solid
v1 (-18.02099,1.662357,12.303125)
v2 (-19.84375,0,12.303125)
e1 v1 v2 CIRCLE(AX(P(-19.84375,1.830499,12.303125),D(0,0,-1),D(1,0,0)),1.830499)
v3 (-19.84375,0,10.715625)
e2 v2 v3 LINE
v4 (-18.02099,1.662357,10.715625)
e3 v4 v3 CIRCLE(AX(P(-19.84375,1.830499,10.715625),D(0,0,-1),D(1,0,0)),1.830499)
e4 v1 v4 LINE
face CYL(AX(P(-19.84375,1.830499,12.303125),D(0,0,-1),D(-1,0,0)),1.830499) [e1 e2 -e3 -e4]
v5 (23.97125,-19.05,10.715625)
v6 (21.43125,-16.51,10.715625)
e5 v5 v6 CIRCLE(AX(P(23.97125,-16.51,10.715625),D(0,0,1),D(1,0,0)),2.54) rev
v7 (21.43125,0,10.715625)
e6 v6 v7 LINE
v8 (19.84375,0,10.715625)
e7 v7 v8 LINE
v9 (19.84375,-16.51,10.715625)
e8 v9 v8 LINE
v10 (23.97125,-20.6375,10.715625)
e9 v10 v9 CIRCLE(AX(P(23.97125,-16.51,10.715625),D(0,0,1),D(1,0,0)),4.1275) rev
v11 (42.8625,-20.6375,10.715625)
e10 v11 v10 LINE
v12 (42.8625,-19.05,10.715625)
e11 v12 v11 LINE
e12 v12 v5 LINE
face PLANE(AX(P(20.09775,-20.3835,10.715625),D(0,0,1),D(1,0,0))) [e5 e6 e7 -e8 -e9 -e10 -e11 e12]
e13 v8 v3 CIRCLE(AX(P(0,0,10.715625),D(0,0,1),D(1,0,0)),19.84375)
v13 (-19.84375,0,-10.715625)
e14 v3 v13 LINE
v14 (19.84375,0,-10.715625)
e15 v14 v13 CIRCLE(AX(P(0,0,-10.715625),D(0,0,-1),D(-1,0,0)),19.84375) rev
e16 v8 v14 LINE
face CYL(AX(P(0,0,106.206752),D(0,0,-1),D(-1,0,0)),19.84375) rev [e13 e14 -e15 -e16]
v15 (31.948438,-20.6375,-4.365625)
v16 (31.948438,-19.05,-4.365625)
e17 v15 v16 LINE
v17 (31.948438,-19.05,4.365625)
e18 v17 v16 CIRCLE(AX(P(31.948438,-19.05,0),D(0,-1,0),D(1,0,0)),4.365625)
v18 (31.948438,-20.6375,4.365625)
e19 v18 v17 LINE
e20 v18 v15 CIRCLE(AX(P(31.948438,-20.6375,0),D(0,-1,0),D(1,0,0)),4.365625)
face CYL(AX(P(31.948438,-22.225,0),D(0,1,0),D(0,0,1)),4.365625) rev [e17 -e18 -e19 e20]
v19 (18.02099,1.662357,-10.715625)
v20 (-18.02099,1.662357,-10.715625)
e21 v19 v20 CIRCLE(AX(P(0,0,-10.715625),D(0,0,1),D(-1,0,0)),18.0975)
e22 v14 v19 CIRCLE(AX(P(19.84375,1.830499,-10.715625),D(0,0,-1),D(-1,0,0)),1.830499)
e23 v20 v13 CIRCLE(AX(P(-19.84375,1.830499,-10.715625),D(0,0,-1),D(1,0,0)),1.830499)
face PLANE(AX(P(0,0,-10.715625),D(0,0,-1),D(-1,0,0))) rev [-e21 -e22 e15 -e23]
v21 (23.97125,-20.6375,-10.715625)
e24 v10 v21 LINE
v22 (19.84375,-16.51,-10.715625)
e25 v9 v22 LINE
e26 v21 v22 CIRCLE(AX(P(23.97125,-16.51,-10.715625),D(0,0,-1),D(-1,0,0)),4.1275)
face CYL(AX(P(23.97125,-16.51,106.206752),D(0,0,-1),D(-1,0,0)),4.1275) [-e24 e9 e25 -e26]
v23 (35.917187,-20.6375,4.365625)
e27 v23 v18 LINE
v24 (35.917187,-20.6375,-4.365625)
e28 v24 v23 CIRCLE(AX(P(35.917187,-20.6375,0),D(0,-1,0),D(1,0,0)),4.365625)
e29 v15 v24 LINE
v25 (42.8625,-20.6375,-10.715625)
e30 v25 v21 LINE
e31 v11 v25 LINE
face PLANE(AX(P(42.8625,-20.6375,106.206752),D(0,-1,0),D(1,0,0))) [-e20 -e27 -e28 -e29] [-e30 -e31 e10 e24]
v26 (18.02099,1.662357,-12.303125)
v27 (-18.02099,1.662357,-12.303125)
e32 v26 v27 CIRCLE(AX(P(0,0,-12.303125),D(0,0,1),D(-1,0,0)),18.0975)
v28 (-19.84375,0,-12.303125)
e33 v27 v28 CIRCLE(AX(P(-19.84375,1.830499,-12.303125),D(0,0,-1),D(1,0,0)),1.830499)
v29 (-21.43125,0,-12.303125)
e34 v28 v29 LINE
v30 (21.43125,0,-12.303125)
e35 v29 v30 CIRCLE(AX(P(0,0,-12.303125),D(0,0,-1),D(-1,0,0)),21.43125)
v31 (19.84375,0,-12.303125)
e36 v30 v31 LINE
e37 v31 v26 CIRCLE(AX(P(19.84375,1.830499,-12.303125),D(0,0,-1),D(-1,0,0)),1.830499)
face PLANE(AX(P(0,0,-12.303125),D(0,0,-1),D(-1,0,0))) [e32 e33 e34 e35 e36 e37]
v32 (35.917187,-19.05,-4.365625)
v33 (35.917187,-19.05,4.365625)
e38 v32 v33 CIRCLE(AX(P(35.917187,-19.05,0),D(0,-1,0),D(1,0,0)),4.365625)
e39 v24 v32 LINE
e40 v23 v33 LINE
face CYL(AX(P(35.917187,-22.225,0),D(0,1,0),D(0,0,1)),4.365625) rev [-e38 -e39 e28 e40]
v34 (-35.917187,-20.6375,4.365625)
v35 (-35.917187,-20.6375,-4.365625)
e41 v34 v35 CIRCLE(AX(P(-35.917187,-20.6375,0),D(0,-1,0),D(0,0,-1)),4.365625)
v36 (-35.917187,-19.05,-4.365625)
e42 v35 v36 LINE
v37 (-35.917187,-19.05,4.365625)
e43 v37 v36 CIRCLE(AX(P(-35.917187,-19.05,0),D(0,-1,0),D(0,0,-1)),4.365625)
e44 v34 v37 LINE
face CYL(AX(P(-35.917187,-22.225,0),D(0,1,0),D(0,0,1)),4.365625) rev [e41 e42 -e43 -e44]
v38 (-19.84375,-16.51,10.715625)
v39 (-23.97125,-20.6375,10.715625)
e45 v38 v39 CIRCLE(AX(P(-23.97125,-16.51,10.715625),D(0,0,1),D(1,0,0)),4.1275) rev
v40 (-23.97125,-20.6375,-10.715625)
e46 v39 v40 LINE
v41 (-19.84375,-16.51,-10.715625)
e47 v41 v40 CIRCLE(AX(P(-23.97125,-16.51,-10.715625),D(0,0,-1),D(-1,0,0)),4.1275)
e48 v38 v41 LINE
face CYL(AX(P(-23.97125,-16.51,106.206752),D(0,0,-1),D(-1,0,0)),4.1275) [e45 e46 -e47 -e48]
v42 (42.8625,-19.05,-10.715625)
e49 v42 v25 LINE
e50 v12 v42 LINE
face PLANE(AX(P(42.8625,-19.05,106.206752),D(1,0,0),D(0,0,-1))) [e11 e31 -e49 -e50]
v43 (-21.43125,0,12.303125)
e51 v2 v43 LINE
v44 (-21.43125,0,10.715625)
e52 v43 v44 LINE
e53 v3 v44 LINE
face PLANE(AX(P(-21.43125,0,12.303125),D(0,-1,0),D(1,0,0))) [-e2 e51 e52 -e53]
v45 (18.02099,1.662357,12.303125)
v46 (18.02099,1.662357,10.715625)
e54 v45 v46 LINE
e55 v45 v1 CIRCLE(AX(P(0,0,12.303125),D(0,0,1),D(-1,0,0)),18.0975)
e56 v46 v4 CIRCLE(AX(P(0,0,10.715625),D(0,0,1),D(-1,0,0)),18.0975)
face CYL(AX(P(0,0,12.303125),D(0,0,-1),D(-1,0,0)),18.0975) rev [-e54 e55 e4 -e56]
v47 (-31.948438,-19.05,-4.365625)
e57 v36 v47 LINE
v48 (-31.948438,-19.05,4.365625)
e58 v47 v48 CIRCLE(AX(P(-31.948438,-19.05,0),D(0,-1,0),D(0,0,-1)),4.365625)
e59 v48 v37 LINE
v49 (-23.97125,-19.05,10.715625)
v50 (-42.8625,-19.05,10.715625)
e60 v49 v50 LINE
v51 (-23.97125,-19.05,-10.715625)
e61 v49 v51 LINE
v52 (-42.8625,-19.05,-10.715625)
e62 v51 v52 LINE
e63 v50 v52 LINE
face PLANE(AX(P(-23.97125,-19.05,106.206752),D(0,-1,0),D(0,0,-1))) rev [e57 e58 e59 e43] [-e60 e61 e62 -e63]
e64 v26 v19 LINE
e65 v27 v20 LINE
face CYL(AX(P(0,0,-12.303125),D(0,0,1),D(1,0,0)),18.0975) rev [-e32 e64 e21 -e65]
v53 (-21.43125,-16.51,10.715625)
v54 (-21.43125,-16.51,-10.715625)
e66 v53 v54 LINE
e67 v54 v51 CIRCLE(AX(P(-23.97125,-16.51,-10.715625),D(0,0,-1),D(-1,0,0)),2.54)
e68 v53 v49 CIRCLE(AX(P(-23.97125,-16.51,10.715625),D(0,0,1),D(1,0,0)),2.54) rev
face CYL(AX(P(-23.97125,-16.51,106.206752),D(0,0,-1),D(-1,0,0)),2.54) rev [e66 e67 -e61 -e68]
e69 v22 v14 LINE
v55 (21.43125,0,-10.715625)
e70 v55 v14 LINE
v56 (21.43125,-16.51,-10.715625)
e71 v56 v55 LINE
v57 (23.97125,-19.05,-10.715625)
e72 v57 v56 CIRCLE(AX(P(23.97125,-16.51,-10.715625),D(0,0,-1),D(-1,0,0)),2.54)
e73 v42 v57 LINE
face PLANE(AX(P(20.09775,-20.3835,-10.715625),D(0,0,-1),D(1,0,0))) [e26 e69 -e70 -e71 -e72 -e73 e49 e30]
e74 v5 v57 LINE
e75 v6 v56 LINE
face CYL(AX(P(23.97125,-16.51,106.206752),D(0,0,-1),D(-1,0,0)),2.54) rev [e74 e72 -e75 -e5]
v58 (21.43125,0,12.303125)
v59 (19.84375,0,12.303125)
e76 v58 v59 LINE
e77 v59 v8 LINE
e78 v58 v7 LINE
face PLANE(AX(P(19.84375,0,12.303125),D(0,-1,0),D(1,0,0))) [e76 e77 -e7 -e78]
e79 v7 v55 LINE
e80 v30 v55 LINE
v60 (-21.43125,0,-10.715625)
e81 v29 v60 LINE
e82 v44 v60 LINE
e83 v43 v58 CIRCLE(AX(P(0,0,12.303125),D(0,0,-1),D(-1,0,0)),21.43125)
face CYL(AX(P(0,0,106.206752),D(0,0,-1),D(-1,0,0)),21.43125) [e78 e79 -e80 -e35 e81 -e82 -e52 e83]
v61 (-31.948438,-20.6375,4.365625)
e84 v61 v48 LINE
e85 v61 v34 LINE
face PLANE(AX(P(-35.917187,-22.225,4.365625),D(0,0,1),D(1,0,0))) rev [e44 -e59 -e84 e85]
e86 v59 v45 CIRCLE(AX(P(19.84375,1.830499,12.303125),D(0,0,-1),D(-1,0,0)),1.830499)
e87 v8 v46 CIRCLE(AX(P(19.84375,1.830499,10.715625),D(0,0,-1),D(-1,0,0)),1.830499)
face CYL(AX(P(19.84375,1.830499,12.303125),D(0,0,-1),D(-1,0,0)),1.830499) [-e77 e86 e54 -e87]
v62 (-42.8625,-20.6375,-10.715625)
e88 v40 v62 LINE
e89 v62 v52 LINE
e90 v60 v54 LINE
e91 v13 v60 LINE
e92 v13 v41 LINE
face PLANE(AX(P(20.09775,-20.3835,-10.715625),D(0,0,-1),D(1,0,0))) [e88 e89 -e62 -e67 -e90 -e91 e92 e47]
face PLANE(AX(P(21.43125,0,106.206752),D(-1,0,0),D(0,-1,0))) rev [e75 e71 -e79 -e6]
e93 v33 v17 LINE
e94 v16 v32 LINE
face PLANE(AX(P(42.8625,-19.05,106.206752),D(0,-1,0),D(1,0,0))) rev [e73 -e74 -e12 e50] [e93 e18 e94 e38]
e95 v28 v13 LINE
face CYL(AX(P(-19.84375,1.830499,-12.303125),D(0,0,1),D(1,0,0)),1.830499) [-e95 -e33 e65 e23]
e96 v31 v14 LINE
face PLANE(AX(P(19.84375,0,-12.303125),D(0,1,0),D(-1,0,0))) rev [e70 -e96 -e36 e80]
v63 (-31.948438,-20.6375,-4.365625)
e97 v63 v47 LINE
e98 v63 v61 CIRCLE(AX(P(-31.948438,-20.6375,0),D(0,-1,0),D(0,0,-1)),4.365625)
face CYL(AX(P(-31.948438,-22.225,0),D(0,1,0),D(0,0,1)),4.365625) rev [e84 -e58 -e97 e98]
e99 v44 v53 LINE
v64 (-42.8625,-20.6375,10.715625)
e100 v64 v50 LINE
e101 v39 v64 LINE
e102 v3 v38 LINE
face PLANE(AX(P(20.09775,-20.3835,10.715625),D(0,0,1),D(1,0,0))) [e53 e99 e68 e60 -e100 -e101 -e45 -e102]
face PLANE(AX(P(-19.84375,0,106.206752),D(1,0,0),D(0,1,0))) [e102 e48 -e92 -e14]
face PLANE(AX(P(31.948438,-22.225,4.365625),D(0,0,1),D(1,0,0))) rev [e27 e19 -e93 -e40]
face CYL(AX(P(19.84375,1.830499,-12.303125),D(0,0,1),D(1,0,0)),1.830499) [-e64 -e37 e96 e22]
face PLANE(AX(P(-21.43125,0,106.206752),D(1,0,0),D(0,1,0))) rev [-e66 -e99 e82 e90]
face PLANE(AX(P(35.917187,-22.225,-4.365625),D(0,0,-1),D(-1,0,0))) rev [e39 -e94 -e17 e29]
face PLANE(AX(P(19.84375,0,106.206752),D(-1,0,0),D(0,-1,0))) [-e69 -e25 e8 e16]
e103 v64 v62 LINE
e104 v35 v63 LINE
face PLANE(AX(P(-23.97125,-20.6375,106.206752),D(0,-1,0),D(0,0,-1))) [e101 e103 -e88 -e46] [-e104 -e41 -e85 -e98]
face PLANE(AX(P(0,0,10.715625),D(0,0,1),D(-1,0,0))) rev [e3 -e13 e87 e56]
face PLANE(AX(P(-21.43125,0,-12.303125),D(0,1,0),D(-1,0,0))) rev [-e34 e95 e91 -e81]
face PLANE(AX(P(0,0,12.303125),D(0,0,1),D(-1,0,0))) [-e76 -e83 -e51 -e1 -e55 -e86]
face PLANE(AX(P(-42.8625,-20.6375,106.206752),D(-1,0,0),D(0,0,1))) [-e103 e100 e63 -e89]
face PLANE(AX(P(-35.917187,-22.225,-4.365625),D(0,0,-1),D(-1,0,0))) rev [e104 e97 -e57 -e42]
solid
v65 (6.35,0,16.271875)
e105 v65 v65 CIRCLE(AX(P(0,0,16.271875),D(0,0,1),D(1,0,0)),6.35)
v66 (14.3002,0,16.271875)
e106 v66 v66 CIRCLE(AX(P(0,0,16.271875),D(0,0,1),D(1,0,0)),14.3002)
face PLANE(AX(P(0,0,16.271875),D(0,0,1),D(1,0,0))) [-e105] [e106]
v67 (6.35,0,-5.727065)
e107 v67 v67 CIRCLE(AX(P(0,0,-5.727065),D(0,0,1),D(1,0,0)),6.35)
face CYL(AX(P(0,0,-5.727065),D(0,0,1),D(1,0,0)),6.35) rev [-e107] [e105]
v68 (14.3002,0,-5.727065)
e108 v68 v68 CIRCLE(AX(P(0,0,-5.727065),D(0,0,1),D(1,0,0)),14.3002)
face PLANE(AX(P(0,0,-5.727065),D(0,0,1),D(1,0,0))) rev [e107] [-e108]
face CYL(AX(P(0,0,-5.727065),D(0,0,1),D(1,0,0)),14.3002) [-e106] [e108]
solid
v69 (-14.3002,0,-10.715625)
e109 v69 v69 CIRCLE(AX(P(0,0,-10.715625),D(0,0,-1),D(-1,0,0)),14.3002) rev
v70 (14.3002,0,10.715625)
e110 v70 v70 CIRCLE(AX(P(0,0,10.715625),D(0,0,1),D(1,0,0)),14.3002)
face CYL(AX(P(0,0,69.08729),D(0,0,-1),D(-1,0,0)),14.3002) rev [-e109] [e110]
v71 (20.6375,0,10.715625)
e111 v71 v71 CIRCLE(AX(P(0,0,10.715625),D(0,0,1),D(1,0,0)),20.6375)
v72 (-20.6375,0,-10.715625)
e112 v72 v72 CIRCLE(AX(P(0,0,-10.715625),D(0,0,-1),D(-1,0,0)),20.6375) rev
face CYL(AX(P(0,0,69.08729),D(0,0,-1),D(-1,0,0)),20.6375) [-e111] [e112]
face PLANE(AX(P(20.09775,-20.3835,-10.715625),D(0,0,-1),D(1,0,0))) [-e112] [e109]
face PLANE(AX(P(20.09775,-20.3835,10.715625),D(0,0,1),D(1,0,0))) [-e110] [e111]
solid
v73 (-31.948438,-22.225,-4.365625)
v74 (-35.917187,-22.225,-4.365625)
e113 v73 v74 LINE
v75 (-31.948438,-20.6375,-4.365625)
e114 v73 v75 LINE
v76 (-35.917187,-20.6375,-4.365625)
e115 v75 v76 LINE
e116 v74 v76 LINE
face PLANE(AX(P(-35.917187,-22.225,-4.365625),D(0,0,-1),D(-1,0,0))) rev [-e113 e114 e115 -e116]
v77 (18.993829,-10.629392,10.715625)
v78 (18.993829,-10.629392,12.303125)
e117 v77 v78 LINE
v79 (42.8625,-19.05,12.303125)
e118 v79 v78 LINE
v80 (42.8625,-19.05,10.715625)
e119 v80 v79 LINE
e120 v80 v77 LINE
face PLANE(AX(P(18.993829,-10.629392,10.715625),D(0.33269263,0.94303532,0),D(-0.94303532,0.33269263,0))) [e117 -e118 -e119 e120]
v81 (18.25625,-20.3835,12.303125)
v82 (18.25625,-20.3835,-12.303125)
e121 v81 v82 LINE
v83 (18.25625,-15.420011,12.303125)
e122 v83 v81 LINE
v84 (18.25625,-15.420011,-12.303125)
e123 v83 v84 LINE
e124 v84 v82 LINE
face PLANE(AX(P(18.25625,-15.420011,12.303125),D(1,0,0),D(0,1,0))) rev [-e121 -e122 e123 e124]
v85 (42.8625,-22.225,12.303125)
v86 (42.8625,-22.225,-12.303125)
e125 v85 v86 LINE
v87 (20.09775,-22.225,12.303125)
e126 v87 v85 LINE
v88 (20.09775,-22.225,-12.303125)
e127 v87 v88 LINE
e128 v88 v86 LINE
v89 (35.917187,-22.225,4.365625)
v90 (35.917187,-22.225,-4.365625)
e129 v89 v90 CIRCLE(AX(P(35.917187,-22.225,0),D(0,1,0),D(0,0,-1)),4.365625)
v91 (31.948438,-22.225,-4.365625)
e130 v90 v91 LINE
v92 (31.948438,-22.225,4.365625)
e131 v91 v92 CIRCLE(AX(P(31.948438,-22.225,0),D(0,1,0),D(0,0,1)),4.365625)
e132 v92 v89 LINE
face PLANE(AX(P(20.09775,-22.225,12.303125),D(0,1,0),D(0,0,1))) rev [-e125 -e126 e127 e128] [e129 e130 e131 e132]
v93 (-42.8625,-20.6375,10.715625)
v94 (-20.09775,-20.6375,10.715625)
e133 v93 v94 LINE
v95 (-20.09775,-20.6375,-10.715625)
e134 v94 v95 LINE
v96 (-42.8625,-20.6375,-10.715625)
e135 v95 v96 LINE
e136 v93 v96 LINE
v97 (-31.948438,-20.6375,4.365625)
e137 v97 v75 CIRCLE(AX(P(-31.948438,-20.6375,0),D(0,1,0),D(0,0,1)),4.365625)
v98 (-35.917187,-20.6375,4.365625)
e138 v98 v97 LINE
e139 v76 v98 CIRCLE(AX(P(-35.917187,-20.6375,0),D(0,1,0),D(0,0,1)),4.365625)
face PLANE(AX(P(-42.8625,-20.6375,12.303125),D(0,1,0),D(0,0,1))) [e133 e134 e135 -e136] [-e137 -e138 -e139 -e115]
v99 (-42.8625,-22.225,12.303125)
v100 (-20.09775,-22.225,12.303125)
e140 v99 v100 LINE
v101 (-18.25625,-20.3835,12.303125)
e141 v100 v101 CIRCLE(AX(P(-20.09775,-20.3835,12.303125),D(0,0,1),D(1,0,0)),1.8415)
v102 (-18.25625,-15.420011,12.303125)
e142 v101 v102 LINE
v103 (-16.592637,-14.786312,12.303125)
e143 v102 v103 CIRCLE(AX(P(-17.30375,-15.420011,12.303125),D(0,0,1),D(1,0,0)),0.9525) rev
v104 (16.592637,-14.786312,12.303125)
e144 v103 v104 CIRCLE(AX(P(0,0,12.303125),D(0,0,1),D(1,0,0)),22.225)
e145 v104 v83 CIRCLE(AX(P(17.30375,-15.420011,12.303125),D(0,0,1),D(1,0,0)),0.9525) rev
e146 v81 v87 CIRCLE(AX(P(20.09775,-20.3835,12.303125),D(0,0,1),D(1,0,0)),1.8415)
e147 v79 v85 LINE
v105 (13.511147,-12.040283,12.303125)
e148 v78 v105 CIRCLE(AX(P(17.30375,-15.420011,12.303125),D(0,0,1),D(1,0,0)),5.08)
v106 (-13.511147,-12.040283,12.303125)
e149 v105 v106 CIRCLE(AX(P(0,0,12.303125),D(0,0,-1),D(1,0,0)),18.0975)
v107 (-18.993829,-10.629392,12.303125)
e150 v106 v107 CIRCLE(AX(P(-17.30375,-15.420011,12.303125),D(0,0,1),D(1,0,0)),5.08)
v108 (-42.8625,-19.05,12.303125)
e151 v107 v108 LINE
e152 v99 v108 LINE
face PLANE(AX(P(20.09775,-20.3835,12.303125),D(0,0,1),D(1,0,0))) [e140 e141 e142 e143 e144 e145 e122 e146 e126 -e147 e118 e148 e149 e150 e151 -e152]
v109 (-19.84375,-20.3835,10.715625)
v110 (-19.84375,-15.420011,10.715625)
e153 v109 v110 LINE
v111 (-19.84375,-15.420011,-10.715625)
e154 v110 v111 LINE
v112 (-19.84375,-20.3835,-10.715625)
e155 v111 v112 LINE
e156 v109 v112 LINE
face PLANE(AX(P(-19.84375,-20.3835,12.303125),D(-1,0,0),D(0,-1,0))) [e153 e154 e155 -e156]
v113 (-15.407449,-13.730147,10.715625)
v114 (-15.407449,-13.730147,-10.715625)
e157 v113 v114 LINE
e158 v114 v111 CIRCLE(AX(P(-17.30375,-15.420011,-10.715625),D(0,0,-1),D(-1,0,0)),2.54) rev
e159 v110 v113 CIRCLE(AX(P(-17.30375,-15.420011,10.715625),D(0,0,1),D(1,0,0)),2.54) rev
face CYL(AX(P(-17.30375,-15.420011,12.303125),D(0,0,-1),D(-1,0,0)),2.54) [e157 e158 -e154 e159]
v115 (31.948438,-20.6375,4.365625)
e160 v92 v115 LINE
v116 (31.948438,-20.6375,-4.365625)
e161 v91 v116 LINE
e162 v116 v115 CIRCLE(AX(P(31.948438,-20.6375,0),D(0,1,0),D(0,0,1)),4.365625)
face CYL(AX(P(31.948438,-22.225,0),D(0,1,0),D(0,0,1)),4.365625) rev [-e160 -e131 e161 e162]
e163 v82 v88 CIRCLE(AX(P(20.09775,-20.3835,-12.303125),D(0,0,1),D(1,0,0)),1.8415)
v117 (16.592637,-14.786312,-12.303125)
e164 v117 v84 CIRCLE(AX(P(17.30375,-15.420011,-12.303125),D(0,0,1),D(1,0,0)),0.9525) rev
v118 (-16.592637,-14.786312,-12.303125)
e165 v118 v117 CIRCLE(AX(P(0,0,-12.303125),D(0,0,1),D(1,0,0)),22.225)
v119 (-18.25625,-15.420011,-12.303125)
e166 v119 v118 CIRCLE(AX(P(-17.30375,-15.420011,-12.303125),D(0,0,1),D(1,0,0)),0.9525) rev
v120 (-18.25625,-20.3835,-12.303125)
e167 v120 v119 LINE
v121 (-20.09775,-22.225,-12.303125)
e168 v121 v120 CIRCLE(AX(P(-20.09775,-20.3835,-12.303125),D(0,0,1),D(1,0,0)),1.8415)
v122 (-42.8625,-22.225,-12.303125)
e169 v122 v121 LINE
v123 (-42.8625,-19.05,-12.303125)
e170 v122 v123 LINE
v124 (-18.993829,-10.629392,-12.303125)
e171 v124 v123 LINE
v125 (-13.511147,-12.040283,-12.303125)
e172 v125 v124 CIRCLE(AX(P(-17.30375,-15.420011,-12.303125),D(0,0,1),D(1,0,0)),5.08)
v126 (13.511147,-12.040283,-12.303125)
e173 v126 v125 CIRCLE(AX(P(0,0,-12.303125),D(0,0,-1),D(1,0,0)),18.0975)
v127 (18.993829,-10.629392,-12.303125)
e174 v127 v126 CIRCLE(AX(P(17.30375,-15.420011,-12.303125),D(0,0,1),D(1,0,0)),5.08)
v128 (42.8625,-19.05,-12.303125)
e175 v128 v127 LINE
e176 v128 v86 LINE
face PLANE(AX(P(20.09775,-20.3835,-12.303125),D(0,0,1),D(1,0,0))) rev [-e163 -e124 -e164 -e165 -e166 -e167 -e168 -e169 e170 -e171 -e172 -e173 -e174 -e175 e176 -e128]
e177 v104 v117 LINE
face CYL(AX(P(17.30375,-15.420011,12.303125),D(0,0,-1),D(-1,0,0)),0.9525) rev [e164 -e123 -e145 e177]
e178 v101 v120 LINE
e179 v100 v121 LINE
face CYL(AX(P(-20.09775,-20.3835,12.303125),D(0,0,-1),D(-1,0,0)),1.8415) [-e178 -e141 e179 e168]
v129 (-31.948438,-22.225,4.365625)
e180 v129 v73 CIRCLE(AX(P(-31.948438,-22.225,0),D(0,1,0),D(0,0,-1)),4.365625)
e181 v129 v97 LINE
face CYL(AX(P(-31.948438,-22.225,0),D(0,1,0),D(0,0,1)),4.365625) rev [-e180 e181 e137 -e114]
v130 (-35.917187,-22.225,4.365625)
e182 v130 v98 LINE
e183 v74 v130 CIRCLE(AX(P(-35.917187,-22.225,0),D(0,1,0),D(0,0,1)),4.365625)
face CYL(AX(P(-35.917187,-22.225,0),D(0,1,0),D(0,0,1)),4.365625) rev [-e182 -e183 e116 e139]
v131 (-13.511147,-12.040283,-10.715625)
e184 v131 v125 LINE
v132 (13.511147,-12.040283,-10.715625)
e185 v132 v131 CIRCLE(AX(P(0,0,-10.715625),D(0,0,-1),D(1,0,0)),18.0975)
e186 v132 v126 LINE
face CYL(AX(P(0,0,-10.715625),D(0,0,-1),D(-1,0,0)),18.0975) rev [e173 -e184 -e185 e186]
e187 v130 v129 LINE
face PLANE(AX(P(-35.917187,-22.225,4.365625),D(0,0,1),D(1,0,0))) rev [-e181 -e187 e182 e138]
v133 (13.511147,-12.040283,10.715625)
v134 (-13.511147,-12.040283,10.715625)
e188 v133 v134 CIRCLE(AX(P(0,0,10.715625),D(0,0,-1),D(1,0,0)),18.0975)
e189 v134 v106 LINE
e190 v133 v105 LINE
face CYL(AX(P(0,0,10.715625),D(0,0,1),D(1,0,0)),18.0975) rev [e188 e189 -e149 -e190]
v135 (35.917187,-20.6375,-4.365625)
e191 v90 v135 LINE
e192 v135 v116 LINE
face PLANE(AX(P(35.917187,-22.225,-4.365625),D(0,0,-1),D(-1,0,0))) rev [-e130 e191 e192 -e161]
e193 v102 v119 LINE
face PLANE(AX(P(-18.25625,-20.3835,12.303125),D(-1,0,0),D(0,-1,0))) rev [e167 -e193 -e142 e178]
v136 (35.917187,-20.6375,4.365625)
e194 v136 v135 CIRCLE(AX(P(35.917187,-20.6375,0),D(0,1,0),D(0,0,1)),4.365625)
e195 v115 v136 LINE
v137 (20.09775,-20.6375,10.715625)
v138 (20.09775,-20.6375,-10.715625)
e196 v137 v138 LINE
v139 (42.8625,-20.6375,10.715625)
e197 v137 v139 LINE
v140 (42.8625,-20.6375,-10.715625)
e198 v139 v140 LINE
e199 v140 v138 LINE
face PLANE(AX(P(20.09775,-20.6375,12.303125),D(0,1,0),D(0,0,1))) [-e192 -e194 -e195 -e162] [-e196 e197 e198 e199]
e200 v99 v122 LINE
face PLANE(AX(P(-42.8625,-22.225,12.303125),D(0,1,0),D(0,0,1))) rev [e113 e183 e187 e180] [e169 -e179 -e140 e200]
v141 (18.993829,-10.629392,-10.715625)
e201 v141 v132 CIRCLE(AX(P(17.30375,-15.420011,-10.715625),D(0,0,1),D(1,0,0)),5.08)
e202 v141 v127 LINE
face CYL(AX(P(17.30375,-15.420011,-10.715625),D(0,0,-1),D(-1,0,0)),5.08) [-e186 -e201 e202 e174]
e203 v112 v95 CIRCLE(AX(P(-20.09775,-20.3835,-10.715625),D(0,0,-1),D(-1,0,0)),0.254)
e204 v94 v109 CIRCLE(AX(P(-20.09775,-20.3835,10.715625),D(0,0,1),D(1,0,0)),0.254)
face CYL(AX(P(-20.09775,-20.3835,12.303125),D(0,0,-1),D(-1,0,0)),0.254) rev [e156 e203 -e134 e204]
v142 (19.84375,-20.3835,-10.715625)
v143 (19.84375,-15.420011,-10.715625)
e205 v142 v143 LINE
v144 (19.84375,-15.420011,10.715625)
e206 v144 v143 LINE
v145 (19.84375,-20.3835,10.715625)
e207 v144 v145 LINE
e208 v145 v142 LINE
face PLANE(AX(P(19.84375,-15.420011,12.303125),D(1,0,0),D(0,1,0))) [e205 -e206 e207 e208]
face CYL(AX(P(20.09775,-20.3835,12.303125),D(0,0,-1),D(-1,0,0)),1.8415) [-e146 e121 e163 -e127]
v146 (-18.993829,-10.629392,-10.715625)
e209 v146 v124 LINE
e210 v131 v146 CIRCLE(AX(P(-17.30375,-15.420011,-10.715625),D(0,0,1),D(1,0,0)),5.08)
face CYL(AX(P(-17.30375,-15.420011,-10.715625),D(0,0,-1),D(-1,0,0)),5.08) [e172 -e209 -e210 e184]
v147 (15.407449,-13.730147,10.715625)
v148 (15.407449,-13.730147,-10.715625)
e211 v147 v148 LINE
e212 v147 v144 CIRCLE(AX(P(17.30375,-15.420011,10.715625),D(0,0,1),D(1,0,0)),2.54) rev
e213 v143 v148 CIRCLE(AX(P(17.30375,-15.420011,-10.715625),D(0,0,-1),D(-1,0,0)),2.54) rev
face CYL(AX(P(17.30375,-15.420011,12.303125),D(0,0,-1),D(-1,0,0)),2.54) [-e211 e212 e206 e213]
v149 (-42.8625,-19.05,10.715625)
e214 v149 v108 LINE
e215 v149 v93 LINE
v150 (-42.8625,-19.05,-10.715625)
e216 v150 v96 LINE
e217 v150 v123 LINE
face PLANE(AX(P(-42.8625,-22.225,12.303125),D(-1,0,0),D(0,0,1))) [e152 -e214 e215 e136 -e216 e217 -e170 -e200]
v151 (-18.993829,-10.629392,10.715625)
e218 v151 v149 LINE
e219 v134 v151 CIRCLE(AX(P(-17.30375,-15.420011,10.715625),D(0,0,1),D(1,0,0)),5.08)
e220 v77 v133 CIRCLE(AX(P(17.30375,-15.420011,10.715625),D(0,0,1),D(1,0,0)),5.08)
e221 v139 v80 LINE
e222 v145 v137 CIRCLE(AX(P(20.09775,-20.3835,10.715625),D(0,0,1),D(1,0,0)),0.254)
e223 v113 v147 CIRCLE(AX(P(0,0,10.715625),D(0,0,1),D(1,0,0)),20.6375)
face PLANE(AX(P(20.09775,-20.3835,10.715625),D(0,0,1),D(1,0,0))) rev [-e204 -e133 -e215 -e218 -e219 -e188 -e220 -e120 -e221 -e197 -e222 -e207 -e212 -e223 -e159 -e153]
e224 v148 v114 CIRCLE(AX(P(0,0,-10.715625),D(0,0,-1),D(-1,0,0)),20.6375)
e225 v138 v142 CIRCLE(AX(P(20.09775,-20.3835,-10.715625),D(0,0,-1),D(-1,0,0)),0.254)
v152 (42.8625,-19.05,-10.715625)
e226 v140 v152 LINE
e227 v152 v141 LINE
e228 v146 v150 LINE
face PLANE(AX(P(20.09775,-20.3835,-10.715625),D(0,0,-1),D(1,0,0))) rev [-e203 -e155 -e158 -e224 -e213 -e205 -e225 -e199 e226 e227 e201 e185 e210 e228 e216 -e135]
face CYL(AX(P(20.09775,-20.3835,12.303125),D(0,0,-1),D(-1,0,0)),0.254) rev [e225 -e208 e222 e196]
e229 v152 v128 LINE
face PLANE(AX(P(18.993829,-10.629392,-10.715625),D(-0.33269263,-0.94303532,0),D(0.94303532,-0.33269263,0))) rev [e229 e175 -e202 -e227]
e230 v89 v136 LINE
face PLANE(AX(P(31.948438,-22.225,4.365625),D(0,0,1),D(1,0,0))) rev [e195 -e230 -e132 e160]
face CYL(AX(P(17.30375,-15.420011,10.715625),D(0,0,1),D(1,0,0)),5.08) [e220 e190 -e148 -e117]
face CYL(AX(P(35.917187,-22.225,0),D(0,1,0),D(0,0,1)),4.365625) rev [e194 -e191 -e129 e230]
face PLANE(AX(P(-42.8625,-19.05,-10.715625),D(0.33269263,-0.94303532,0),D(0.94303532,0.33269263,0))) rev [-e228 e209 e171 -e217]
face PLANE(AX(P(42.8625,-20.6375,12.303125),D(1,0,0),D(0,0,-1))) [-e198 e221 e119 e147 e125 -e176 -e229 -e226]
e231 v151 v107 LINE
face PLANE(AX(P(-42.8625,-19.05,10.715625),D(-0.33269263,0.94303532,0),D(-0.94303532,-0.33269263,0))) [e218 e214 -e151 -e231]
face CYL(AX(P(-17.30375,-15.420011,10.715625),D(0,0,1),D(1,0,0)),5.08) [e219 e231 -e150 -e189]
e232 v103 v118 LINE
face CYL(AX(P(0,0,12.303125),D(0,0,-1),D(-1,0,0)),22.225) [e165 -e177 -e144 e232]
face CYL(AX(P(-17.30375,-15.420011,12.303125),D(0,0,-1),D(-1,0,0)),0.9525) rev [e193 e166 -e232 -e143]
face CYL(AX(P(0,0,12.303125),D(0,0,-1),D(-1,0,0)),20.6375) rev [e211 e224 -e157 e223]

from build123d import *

# Parameters (mm, degrees)
EXTRUDE_THIN2_DEPTH  = 12.303125
EXTRUDE1_DEPTH       = 1.5875
EXTRUDE_THIN3_START  = -10.715625
EXTRUDE_THIN3_DEPTH  = 21.43125
EXTRUDE2_DEPTH       = 1.5875
EXTRUDE3_START       = -10.715625
EXTRUDE3_OUTLINE_R   = 20.6375
EXTRUDE3_OUTLINE_R_2 = 14.3002
EXTRUDE3_DEPTH       = 21.43125
SKETCH8_R            = 14.3002
SKETCH8_R_2          = 6.35
EXTRUDE4_DEPTH       = 21.99894
CUT_EXTRUDE1_DEPTH   = 51.950156499


# Read off the part's stored shape, not the designer's step: Extrude-Thin3, Extrude3
with BuildPart() as part:
    # Sketch1 → Extrude-Thin2 (new, symmetric)
    with BuildSketch(Plane.XY):
        with BuildLine():
            Line((-42.8625, -20.6375), (-20.09775, -20.6375))
            ThreePointArc((-20.09775, -20.6375), (-19.918144878, -20.563105122), (-19.84375, -20.3835))
            Line((-19.84375, -20.3835), (-19.84375, -15.420011096))
            ThreePointArc((-19.84375, -15.420011096), (-18.207905551, -13.0463846), (-15.40744863, -13.730146866))
            ThreePointArc((-15.40744863, -13.730146866), (0, -20.6375), (15.40744863, -13.730146866))
            ThreePointArc((15.40744863, -13.730146866), (18.207905551, -13.0463846), (19.84375, -15.420011096))
            Line((19.84375, -15.420011096), (19.84375, -20.3835))
            ThreePointArc((19.84375, -20.3835), (19.918144878, -20.563105122), (20.09775, -20.6375))
            Line((20.09775, -20.6375), (42.8625, -20.6375))
            Line((42.8625, -20.6375), (42.8625, -22.225))
            Line((42.8625, -22.225), (20.09775, -22.225))
            ThreePointArc((20.09775, -22.225), (18.795612862, -21.685637138), (18.25625, -20.3835))
            Line((18.25625, -20.3835), (18.25625, -15.420011096))
            ThreePointArc((18.25625, -15.420011096), (17.642808332, -14.52990116), (16.592636986, -14.786312009))
            ThreePointArc((16.592636986, -14.786312009), (0, -22.225), (-16.592636986, -14.786312009))
            ThreePointArc((-16.592636986, -14.786312009), (-17.642808332, -14.52990116), (-18.25625, -15.420011096))
            Line((-18.25625, -15.420011096), (-18.25625, -20.3835))
            ThreePointArc((-18.25625, -20.3835), (-18.795612862, -21.685637138), (-20.09775, -22.225))
            Line((-20.09775, -22.225), (-42.8625, -22.225))
            Line((-42.8625, -22.225), (-42.8625, -20.6375))
        make_face()
    extrude(amount=EXTRUDE_THIN2_DEPTH, both=True)

    # Sketch4 → Extrude1 (add)
    with BuildSketch(Plane.XY.offset(12.303125)):
        with BuildLine():
            Line((-42.8625, -19.05), (-18.993828558, -10.629391671))
            ThreePointArc((-18.993828558, -10.629391671), (-16.037730525, -10.500296197), (-13.51114726, -12.040282636))
            ThreePointArc((-13.51114726, -12.040282636), (0, -18.0975), (13.51114726, -12.040282636))
            ThreePointArc((13.51114726, -12.040282636), (16.037730525, -10.500296197), (18.993828558, -10.629391671))
            Line((18.993828558, -10.629391671), (42.8625, -19.05))
            Line((42.8625, -19.05), (42.8625, -22.225))
            Line((42.8625, -22.225), (20.09775, -22.225))
            ThreePointArc((20.09775, -22.225), (18.795612862, -21.685637138), (18.25625, -20.3835))
            Line((18.25625, -20.3835), (18.25625, -15.420011096))
            ThreePointArc((18.25625, -15.420011096), (17.642808332, -14.52990116), (16.592636986, -14.786312009))
            ThreePointArc((16.592636986, -14.786312009), (0, -22.225), (-16.592636986, -14.786312009))
            ThreePointArc((-16.592636986, -14.786312009), (-17.642808332, -14.52990116), (-18.25625, -15.420011096))
            Line((-18.25625, -15.420011096), (-18.25625, -20.3835))
            ThreePointArc((-18.25625, -20.3835), (-18.795612862, -21.685637138), (-20.09775, -22.225))
            Line((-20.09775, -22.225), (-42.8625, -22.225))
            Line((-42.8625, -22.225), (-42.8625, -19.05))
        make_face()
    extrude1 = extrude(amount=-EXTRUDE1_DEPTH)

    # Mirror1: Extrude1 across plane
    add(extrude1.mirror(Plane.XY))


with BuildPart() as body_2:
    # Extrude-Thin3 outline → Extrude-Thin3 (new body)
    with BuildSketch(Plane.XY.offset(EXTRUDE_THIN3_START)):
        with BuildLine():
            Line((-23.97125, -19.05), (-42.8625, -19.05))
            Line((-42.8625, -19.05), (-42.8625, -20.6375))
            Line((-42.8625, -20.6375), (-23.97125, -20.6375))
            ThreePointArc((-23.97125, -20.6375), (-21.052666761, -19.428583239), (-19.84375, -16.51))
            Line((-19.84375, -16.51), (-19.84375, 0))
            ThreePointArc((-19.84375, 0), (0, 19.84375), (19.84375, 0))
            Line((19.84375, 0), (19.84375, -16.51))
            ThreePointArc((19.84375, -16.51), (21.052666761, -19.428583239), (23.97125, -20.6375))
            Line((23.97125, -20.6375), (42.8625, -20.6375))
            Line((42.8625, -20.6375), (42.8625, -19.05))
            Line((42.8625, -19.05), (23.97125, -19.05))
            ThreePointArc((23.97125, -19.05), (22.175198776, -18.306051224), (21.43125, -16.51))
            Line((21.43125, -16.51), (21.43125, 0))
            ThreePointArc((21.43125, 0), (0, 21.43125), (-21.43125, 0))
            Line((-21.43125, 0), (-21.43125, -16.51))
            ThreePointArc((-21.43125, -16.51), (-22.175198776, -18.306051224), (-23.97125, -19.05))
        make_face()
    extrude(amount=EXTRUDE_THIN3_DEPTH)

    # Sketch6 → Extrude2 (add)
    with BuildSketch(Plane(origin=(0, 0, -10.715625), x_dir=(-1, 0, 0), z_dir=(0, 0, -1))):
        with BuildLine():
            Line((-19.84375, 0), (-21.43125, 0))
            ThreePointArc((-21.43125, 0), (0, 21.43125), (21.43125, 0))
            Line((21.43125, 0), (19.84375, 0))
            ThreePointArc((19.84375, 0), (18.610270538, 0.477999494), (18.020989833, 1.662357273))
            ThreePointArc((18.020989833, 1.662357273), (0, 18.0975), (-18.020989833, 1.662357273))
            ThreePointArc((-18.020989833, 1.662357273), (-18.610270538, 0.477999494), (-19.84375, 0))
        make_face()
    extrude2 = extrude(amount=EXTRUDE2_DEPTH)

    # Mirror2: Extrude2 across plane
    add(extrude2.mirror(Plane.XY))


with BuildPart() as body_3:
    # Extrude3 outline → Extrude3 (new body)
    with BuildSketch(Plane.XY.offset(EXTRUDE3_START)):
        Circle(EXTRUDE3_OUTLINE_R)
        Circle(EXTRUDE3_OUTLINE_R_2, mode=Mode.SUBTRACT)
    extrude(amount=EXTRUDE3_DEPTH)


with BuildPart() as body_4:
    # Sketch8 → Extrude4 (new body)
    with BuildSketch(Plane.XY.offset(16.271875)):
        Circle(SKETCH8_R)
        Circle(SKETCH8_R_2, mode=Mode.SUBTRACT)
    extrude(amount=-EXTRUDE4_DEPTH)


with BuildPart() as cut_extrude1_tool:
    # Sketch3 → Cut-Extrude1 (new, through all)
    with BuildSketch(Plane(origin=(0, 0, 0), x_dir=(1, 0, 0), z_dir=(0, 1, 0))):
        with BuildLine():
            Line((-35.9171875, 4.365625), (-31.9484375, 4.365625))
            ThreePointArc((-31.9484375, 4.365625), (-27.5828125, 0), (-31.9484375, -4.365625))
            Line((-31.9484375, -4.365625), (-35.9171875, -4.365625))
            ThreePointArc((-35.9171875, -4.365625), (-40.2828125, 0), (-35.9171875, 4.365625))
        make_face()
        with BuildLine():
            Line((31.9484375, -4.365625), (35.9171875, -4.365625))
            ThreePointArc((35.9171875, -4.365625), (40.2828125, 0), (35.9171875, 4.365625))
            Line((35.9171875, 4.365625), (31.9484375, 4.365625))
            ThreePointArc((31.9484375, 4.365625), (27.5828125, 0), (31.9484375, -4.365625))
        make_face()
    extrude(amount=-CUT_EXTRUDE1_DEPTH)


with BuildPart() as part_1:
    add(part.part)

    # Cut-Extrude1: cut by cut_extrude1_tool
    add(cut_extrude1_tool.part, mode=Mode.SUBTRACT)


with BuildPart() as body_2_1:
    add(body_2.part)

    # Cut-Extrude1: cut by cut_extrude1_tool
    add(cut_extrude1_tool.part, mode=Mode.SUBTRACT)


solid = Compound([body_3.part, body_4.part, part_1.part, body_2_1.part])
